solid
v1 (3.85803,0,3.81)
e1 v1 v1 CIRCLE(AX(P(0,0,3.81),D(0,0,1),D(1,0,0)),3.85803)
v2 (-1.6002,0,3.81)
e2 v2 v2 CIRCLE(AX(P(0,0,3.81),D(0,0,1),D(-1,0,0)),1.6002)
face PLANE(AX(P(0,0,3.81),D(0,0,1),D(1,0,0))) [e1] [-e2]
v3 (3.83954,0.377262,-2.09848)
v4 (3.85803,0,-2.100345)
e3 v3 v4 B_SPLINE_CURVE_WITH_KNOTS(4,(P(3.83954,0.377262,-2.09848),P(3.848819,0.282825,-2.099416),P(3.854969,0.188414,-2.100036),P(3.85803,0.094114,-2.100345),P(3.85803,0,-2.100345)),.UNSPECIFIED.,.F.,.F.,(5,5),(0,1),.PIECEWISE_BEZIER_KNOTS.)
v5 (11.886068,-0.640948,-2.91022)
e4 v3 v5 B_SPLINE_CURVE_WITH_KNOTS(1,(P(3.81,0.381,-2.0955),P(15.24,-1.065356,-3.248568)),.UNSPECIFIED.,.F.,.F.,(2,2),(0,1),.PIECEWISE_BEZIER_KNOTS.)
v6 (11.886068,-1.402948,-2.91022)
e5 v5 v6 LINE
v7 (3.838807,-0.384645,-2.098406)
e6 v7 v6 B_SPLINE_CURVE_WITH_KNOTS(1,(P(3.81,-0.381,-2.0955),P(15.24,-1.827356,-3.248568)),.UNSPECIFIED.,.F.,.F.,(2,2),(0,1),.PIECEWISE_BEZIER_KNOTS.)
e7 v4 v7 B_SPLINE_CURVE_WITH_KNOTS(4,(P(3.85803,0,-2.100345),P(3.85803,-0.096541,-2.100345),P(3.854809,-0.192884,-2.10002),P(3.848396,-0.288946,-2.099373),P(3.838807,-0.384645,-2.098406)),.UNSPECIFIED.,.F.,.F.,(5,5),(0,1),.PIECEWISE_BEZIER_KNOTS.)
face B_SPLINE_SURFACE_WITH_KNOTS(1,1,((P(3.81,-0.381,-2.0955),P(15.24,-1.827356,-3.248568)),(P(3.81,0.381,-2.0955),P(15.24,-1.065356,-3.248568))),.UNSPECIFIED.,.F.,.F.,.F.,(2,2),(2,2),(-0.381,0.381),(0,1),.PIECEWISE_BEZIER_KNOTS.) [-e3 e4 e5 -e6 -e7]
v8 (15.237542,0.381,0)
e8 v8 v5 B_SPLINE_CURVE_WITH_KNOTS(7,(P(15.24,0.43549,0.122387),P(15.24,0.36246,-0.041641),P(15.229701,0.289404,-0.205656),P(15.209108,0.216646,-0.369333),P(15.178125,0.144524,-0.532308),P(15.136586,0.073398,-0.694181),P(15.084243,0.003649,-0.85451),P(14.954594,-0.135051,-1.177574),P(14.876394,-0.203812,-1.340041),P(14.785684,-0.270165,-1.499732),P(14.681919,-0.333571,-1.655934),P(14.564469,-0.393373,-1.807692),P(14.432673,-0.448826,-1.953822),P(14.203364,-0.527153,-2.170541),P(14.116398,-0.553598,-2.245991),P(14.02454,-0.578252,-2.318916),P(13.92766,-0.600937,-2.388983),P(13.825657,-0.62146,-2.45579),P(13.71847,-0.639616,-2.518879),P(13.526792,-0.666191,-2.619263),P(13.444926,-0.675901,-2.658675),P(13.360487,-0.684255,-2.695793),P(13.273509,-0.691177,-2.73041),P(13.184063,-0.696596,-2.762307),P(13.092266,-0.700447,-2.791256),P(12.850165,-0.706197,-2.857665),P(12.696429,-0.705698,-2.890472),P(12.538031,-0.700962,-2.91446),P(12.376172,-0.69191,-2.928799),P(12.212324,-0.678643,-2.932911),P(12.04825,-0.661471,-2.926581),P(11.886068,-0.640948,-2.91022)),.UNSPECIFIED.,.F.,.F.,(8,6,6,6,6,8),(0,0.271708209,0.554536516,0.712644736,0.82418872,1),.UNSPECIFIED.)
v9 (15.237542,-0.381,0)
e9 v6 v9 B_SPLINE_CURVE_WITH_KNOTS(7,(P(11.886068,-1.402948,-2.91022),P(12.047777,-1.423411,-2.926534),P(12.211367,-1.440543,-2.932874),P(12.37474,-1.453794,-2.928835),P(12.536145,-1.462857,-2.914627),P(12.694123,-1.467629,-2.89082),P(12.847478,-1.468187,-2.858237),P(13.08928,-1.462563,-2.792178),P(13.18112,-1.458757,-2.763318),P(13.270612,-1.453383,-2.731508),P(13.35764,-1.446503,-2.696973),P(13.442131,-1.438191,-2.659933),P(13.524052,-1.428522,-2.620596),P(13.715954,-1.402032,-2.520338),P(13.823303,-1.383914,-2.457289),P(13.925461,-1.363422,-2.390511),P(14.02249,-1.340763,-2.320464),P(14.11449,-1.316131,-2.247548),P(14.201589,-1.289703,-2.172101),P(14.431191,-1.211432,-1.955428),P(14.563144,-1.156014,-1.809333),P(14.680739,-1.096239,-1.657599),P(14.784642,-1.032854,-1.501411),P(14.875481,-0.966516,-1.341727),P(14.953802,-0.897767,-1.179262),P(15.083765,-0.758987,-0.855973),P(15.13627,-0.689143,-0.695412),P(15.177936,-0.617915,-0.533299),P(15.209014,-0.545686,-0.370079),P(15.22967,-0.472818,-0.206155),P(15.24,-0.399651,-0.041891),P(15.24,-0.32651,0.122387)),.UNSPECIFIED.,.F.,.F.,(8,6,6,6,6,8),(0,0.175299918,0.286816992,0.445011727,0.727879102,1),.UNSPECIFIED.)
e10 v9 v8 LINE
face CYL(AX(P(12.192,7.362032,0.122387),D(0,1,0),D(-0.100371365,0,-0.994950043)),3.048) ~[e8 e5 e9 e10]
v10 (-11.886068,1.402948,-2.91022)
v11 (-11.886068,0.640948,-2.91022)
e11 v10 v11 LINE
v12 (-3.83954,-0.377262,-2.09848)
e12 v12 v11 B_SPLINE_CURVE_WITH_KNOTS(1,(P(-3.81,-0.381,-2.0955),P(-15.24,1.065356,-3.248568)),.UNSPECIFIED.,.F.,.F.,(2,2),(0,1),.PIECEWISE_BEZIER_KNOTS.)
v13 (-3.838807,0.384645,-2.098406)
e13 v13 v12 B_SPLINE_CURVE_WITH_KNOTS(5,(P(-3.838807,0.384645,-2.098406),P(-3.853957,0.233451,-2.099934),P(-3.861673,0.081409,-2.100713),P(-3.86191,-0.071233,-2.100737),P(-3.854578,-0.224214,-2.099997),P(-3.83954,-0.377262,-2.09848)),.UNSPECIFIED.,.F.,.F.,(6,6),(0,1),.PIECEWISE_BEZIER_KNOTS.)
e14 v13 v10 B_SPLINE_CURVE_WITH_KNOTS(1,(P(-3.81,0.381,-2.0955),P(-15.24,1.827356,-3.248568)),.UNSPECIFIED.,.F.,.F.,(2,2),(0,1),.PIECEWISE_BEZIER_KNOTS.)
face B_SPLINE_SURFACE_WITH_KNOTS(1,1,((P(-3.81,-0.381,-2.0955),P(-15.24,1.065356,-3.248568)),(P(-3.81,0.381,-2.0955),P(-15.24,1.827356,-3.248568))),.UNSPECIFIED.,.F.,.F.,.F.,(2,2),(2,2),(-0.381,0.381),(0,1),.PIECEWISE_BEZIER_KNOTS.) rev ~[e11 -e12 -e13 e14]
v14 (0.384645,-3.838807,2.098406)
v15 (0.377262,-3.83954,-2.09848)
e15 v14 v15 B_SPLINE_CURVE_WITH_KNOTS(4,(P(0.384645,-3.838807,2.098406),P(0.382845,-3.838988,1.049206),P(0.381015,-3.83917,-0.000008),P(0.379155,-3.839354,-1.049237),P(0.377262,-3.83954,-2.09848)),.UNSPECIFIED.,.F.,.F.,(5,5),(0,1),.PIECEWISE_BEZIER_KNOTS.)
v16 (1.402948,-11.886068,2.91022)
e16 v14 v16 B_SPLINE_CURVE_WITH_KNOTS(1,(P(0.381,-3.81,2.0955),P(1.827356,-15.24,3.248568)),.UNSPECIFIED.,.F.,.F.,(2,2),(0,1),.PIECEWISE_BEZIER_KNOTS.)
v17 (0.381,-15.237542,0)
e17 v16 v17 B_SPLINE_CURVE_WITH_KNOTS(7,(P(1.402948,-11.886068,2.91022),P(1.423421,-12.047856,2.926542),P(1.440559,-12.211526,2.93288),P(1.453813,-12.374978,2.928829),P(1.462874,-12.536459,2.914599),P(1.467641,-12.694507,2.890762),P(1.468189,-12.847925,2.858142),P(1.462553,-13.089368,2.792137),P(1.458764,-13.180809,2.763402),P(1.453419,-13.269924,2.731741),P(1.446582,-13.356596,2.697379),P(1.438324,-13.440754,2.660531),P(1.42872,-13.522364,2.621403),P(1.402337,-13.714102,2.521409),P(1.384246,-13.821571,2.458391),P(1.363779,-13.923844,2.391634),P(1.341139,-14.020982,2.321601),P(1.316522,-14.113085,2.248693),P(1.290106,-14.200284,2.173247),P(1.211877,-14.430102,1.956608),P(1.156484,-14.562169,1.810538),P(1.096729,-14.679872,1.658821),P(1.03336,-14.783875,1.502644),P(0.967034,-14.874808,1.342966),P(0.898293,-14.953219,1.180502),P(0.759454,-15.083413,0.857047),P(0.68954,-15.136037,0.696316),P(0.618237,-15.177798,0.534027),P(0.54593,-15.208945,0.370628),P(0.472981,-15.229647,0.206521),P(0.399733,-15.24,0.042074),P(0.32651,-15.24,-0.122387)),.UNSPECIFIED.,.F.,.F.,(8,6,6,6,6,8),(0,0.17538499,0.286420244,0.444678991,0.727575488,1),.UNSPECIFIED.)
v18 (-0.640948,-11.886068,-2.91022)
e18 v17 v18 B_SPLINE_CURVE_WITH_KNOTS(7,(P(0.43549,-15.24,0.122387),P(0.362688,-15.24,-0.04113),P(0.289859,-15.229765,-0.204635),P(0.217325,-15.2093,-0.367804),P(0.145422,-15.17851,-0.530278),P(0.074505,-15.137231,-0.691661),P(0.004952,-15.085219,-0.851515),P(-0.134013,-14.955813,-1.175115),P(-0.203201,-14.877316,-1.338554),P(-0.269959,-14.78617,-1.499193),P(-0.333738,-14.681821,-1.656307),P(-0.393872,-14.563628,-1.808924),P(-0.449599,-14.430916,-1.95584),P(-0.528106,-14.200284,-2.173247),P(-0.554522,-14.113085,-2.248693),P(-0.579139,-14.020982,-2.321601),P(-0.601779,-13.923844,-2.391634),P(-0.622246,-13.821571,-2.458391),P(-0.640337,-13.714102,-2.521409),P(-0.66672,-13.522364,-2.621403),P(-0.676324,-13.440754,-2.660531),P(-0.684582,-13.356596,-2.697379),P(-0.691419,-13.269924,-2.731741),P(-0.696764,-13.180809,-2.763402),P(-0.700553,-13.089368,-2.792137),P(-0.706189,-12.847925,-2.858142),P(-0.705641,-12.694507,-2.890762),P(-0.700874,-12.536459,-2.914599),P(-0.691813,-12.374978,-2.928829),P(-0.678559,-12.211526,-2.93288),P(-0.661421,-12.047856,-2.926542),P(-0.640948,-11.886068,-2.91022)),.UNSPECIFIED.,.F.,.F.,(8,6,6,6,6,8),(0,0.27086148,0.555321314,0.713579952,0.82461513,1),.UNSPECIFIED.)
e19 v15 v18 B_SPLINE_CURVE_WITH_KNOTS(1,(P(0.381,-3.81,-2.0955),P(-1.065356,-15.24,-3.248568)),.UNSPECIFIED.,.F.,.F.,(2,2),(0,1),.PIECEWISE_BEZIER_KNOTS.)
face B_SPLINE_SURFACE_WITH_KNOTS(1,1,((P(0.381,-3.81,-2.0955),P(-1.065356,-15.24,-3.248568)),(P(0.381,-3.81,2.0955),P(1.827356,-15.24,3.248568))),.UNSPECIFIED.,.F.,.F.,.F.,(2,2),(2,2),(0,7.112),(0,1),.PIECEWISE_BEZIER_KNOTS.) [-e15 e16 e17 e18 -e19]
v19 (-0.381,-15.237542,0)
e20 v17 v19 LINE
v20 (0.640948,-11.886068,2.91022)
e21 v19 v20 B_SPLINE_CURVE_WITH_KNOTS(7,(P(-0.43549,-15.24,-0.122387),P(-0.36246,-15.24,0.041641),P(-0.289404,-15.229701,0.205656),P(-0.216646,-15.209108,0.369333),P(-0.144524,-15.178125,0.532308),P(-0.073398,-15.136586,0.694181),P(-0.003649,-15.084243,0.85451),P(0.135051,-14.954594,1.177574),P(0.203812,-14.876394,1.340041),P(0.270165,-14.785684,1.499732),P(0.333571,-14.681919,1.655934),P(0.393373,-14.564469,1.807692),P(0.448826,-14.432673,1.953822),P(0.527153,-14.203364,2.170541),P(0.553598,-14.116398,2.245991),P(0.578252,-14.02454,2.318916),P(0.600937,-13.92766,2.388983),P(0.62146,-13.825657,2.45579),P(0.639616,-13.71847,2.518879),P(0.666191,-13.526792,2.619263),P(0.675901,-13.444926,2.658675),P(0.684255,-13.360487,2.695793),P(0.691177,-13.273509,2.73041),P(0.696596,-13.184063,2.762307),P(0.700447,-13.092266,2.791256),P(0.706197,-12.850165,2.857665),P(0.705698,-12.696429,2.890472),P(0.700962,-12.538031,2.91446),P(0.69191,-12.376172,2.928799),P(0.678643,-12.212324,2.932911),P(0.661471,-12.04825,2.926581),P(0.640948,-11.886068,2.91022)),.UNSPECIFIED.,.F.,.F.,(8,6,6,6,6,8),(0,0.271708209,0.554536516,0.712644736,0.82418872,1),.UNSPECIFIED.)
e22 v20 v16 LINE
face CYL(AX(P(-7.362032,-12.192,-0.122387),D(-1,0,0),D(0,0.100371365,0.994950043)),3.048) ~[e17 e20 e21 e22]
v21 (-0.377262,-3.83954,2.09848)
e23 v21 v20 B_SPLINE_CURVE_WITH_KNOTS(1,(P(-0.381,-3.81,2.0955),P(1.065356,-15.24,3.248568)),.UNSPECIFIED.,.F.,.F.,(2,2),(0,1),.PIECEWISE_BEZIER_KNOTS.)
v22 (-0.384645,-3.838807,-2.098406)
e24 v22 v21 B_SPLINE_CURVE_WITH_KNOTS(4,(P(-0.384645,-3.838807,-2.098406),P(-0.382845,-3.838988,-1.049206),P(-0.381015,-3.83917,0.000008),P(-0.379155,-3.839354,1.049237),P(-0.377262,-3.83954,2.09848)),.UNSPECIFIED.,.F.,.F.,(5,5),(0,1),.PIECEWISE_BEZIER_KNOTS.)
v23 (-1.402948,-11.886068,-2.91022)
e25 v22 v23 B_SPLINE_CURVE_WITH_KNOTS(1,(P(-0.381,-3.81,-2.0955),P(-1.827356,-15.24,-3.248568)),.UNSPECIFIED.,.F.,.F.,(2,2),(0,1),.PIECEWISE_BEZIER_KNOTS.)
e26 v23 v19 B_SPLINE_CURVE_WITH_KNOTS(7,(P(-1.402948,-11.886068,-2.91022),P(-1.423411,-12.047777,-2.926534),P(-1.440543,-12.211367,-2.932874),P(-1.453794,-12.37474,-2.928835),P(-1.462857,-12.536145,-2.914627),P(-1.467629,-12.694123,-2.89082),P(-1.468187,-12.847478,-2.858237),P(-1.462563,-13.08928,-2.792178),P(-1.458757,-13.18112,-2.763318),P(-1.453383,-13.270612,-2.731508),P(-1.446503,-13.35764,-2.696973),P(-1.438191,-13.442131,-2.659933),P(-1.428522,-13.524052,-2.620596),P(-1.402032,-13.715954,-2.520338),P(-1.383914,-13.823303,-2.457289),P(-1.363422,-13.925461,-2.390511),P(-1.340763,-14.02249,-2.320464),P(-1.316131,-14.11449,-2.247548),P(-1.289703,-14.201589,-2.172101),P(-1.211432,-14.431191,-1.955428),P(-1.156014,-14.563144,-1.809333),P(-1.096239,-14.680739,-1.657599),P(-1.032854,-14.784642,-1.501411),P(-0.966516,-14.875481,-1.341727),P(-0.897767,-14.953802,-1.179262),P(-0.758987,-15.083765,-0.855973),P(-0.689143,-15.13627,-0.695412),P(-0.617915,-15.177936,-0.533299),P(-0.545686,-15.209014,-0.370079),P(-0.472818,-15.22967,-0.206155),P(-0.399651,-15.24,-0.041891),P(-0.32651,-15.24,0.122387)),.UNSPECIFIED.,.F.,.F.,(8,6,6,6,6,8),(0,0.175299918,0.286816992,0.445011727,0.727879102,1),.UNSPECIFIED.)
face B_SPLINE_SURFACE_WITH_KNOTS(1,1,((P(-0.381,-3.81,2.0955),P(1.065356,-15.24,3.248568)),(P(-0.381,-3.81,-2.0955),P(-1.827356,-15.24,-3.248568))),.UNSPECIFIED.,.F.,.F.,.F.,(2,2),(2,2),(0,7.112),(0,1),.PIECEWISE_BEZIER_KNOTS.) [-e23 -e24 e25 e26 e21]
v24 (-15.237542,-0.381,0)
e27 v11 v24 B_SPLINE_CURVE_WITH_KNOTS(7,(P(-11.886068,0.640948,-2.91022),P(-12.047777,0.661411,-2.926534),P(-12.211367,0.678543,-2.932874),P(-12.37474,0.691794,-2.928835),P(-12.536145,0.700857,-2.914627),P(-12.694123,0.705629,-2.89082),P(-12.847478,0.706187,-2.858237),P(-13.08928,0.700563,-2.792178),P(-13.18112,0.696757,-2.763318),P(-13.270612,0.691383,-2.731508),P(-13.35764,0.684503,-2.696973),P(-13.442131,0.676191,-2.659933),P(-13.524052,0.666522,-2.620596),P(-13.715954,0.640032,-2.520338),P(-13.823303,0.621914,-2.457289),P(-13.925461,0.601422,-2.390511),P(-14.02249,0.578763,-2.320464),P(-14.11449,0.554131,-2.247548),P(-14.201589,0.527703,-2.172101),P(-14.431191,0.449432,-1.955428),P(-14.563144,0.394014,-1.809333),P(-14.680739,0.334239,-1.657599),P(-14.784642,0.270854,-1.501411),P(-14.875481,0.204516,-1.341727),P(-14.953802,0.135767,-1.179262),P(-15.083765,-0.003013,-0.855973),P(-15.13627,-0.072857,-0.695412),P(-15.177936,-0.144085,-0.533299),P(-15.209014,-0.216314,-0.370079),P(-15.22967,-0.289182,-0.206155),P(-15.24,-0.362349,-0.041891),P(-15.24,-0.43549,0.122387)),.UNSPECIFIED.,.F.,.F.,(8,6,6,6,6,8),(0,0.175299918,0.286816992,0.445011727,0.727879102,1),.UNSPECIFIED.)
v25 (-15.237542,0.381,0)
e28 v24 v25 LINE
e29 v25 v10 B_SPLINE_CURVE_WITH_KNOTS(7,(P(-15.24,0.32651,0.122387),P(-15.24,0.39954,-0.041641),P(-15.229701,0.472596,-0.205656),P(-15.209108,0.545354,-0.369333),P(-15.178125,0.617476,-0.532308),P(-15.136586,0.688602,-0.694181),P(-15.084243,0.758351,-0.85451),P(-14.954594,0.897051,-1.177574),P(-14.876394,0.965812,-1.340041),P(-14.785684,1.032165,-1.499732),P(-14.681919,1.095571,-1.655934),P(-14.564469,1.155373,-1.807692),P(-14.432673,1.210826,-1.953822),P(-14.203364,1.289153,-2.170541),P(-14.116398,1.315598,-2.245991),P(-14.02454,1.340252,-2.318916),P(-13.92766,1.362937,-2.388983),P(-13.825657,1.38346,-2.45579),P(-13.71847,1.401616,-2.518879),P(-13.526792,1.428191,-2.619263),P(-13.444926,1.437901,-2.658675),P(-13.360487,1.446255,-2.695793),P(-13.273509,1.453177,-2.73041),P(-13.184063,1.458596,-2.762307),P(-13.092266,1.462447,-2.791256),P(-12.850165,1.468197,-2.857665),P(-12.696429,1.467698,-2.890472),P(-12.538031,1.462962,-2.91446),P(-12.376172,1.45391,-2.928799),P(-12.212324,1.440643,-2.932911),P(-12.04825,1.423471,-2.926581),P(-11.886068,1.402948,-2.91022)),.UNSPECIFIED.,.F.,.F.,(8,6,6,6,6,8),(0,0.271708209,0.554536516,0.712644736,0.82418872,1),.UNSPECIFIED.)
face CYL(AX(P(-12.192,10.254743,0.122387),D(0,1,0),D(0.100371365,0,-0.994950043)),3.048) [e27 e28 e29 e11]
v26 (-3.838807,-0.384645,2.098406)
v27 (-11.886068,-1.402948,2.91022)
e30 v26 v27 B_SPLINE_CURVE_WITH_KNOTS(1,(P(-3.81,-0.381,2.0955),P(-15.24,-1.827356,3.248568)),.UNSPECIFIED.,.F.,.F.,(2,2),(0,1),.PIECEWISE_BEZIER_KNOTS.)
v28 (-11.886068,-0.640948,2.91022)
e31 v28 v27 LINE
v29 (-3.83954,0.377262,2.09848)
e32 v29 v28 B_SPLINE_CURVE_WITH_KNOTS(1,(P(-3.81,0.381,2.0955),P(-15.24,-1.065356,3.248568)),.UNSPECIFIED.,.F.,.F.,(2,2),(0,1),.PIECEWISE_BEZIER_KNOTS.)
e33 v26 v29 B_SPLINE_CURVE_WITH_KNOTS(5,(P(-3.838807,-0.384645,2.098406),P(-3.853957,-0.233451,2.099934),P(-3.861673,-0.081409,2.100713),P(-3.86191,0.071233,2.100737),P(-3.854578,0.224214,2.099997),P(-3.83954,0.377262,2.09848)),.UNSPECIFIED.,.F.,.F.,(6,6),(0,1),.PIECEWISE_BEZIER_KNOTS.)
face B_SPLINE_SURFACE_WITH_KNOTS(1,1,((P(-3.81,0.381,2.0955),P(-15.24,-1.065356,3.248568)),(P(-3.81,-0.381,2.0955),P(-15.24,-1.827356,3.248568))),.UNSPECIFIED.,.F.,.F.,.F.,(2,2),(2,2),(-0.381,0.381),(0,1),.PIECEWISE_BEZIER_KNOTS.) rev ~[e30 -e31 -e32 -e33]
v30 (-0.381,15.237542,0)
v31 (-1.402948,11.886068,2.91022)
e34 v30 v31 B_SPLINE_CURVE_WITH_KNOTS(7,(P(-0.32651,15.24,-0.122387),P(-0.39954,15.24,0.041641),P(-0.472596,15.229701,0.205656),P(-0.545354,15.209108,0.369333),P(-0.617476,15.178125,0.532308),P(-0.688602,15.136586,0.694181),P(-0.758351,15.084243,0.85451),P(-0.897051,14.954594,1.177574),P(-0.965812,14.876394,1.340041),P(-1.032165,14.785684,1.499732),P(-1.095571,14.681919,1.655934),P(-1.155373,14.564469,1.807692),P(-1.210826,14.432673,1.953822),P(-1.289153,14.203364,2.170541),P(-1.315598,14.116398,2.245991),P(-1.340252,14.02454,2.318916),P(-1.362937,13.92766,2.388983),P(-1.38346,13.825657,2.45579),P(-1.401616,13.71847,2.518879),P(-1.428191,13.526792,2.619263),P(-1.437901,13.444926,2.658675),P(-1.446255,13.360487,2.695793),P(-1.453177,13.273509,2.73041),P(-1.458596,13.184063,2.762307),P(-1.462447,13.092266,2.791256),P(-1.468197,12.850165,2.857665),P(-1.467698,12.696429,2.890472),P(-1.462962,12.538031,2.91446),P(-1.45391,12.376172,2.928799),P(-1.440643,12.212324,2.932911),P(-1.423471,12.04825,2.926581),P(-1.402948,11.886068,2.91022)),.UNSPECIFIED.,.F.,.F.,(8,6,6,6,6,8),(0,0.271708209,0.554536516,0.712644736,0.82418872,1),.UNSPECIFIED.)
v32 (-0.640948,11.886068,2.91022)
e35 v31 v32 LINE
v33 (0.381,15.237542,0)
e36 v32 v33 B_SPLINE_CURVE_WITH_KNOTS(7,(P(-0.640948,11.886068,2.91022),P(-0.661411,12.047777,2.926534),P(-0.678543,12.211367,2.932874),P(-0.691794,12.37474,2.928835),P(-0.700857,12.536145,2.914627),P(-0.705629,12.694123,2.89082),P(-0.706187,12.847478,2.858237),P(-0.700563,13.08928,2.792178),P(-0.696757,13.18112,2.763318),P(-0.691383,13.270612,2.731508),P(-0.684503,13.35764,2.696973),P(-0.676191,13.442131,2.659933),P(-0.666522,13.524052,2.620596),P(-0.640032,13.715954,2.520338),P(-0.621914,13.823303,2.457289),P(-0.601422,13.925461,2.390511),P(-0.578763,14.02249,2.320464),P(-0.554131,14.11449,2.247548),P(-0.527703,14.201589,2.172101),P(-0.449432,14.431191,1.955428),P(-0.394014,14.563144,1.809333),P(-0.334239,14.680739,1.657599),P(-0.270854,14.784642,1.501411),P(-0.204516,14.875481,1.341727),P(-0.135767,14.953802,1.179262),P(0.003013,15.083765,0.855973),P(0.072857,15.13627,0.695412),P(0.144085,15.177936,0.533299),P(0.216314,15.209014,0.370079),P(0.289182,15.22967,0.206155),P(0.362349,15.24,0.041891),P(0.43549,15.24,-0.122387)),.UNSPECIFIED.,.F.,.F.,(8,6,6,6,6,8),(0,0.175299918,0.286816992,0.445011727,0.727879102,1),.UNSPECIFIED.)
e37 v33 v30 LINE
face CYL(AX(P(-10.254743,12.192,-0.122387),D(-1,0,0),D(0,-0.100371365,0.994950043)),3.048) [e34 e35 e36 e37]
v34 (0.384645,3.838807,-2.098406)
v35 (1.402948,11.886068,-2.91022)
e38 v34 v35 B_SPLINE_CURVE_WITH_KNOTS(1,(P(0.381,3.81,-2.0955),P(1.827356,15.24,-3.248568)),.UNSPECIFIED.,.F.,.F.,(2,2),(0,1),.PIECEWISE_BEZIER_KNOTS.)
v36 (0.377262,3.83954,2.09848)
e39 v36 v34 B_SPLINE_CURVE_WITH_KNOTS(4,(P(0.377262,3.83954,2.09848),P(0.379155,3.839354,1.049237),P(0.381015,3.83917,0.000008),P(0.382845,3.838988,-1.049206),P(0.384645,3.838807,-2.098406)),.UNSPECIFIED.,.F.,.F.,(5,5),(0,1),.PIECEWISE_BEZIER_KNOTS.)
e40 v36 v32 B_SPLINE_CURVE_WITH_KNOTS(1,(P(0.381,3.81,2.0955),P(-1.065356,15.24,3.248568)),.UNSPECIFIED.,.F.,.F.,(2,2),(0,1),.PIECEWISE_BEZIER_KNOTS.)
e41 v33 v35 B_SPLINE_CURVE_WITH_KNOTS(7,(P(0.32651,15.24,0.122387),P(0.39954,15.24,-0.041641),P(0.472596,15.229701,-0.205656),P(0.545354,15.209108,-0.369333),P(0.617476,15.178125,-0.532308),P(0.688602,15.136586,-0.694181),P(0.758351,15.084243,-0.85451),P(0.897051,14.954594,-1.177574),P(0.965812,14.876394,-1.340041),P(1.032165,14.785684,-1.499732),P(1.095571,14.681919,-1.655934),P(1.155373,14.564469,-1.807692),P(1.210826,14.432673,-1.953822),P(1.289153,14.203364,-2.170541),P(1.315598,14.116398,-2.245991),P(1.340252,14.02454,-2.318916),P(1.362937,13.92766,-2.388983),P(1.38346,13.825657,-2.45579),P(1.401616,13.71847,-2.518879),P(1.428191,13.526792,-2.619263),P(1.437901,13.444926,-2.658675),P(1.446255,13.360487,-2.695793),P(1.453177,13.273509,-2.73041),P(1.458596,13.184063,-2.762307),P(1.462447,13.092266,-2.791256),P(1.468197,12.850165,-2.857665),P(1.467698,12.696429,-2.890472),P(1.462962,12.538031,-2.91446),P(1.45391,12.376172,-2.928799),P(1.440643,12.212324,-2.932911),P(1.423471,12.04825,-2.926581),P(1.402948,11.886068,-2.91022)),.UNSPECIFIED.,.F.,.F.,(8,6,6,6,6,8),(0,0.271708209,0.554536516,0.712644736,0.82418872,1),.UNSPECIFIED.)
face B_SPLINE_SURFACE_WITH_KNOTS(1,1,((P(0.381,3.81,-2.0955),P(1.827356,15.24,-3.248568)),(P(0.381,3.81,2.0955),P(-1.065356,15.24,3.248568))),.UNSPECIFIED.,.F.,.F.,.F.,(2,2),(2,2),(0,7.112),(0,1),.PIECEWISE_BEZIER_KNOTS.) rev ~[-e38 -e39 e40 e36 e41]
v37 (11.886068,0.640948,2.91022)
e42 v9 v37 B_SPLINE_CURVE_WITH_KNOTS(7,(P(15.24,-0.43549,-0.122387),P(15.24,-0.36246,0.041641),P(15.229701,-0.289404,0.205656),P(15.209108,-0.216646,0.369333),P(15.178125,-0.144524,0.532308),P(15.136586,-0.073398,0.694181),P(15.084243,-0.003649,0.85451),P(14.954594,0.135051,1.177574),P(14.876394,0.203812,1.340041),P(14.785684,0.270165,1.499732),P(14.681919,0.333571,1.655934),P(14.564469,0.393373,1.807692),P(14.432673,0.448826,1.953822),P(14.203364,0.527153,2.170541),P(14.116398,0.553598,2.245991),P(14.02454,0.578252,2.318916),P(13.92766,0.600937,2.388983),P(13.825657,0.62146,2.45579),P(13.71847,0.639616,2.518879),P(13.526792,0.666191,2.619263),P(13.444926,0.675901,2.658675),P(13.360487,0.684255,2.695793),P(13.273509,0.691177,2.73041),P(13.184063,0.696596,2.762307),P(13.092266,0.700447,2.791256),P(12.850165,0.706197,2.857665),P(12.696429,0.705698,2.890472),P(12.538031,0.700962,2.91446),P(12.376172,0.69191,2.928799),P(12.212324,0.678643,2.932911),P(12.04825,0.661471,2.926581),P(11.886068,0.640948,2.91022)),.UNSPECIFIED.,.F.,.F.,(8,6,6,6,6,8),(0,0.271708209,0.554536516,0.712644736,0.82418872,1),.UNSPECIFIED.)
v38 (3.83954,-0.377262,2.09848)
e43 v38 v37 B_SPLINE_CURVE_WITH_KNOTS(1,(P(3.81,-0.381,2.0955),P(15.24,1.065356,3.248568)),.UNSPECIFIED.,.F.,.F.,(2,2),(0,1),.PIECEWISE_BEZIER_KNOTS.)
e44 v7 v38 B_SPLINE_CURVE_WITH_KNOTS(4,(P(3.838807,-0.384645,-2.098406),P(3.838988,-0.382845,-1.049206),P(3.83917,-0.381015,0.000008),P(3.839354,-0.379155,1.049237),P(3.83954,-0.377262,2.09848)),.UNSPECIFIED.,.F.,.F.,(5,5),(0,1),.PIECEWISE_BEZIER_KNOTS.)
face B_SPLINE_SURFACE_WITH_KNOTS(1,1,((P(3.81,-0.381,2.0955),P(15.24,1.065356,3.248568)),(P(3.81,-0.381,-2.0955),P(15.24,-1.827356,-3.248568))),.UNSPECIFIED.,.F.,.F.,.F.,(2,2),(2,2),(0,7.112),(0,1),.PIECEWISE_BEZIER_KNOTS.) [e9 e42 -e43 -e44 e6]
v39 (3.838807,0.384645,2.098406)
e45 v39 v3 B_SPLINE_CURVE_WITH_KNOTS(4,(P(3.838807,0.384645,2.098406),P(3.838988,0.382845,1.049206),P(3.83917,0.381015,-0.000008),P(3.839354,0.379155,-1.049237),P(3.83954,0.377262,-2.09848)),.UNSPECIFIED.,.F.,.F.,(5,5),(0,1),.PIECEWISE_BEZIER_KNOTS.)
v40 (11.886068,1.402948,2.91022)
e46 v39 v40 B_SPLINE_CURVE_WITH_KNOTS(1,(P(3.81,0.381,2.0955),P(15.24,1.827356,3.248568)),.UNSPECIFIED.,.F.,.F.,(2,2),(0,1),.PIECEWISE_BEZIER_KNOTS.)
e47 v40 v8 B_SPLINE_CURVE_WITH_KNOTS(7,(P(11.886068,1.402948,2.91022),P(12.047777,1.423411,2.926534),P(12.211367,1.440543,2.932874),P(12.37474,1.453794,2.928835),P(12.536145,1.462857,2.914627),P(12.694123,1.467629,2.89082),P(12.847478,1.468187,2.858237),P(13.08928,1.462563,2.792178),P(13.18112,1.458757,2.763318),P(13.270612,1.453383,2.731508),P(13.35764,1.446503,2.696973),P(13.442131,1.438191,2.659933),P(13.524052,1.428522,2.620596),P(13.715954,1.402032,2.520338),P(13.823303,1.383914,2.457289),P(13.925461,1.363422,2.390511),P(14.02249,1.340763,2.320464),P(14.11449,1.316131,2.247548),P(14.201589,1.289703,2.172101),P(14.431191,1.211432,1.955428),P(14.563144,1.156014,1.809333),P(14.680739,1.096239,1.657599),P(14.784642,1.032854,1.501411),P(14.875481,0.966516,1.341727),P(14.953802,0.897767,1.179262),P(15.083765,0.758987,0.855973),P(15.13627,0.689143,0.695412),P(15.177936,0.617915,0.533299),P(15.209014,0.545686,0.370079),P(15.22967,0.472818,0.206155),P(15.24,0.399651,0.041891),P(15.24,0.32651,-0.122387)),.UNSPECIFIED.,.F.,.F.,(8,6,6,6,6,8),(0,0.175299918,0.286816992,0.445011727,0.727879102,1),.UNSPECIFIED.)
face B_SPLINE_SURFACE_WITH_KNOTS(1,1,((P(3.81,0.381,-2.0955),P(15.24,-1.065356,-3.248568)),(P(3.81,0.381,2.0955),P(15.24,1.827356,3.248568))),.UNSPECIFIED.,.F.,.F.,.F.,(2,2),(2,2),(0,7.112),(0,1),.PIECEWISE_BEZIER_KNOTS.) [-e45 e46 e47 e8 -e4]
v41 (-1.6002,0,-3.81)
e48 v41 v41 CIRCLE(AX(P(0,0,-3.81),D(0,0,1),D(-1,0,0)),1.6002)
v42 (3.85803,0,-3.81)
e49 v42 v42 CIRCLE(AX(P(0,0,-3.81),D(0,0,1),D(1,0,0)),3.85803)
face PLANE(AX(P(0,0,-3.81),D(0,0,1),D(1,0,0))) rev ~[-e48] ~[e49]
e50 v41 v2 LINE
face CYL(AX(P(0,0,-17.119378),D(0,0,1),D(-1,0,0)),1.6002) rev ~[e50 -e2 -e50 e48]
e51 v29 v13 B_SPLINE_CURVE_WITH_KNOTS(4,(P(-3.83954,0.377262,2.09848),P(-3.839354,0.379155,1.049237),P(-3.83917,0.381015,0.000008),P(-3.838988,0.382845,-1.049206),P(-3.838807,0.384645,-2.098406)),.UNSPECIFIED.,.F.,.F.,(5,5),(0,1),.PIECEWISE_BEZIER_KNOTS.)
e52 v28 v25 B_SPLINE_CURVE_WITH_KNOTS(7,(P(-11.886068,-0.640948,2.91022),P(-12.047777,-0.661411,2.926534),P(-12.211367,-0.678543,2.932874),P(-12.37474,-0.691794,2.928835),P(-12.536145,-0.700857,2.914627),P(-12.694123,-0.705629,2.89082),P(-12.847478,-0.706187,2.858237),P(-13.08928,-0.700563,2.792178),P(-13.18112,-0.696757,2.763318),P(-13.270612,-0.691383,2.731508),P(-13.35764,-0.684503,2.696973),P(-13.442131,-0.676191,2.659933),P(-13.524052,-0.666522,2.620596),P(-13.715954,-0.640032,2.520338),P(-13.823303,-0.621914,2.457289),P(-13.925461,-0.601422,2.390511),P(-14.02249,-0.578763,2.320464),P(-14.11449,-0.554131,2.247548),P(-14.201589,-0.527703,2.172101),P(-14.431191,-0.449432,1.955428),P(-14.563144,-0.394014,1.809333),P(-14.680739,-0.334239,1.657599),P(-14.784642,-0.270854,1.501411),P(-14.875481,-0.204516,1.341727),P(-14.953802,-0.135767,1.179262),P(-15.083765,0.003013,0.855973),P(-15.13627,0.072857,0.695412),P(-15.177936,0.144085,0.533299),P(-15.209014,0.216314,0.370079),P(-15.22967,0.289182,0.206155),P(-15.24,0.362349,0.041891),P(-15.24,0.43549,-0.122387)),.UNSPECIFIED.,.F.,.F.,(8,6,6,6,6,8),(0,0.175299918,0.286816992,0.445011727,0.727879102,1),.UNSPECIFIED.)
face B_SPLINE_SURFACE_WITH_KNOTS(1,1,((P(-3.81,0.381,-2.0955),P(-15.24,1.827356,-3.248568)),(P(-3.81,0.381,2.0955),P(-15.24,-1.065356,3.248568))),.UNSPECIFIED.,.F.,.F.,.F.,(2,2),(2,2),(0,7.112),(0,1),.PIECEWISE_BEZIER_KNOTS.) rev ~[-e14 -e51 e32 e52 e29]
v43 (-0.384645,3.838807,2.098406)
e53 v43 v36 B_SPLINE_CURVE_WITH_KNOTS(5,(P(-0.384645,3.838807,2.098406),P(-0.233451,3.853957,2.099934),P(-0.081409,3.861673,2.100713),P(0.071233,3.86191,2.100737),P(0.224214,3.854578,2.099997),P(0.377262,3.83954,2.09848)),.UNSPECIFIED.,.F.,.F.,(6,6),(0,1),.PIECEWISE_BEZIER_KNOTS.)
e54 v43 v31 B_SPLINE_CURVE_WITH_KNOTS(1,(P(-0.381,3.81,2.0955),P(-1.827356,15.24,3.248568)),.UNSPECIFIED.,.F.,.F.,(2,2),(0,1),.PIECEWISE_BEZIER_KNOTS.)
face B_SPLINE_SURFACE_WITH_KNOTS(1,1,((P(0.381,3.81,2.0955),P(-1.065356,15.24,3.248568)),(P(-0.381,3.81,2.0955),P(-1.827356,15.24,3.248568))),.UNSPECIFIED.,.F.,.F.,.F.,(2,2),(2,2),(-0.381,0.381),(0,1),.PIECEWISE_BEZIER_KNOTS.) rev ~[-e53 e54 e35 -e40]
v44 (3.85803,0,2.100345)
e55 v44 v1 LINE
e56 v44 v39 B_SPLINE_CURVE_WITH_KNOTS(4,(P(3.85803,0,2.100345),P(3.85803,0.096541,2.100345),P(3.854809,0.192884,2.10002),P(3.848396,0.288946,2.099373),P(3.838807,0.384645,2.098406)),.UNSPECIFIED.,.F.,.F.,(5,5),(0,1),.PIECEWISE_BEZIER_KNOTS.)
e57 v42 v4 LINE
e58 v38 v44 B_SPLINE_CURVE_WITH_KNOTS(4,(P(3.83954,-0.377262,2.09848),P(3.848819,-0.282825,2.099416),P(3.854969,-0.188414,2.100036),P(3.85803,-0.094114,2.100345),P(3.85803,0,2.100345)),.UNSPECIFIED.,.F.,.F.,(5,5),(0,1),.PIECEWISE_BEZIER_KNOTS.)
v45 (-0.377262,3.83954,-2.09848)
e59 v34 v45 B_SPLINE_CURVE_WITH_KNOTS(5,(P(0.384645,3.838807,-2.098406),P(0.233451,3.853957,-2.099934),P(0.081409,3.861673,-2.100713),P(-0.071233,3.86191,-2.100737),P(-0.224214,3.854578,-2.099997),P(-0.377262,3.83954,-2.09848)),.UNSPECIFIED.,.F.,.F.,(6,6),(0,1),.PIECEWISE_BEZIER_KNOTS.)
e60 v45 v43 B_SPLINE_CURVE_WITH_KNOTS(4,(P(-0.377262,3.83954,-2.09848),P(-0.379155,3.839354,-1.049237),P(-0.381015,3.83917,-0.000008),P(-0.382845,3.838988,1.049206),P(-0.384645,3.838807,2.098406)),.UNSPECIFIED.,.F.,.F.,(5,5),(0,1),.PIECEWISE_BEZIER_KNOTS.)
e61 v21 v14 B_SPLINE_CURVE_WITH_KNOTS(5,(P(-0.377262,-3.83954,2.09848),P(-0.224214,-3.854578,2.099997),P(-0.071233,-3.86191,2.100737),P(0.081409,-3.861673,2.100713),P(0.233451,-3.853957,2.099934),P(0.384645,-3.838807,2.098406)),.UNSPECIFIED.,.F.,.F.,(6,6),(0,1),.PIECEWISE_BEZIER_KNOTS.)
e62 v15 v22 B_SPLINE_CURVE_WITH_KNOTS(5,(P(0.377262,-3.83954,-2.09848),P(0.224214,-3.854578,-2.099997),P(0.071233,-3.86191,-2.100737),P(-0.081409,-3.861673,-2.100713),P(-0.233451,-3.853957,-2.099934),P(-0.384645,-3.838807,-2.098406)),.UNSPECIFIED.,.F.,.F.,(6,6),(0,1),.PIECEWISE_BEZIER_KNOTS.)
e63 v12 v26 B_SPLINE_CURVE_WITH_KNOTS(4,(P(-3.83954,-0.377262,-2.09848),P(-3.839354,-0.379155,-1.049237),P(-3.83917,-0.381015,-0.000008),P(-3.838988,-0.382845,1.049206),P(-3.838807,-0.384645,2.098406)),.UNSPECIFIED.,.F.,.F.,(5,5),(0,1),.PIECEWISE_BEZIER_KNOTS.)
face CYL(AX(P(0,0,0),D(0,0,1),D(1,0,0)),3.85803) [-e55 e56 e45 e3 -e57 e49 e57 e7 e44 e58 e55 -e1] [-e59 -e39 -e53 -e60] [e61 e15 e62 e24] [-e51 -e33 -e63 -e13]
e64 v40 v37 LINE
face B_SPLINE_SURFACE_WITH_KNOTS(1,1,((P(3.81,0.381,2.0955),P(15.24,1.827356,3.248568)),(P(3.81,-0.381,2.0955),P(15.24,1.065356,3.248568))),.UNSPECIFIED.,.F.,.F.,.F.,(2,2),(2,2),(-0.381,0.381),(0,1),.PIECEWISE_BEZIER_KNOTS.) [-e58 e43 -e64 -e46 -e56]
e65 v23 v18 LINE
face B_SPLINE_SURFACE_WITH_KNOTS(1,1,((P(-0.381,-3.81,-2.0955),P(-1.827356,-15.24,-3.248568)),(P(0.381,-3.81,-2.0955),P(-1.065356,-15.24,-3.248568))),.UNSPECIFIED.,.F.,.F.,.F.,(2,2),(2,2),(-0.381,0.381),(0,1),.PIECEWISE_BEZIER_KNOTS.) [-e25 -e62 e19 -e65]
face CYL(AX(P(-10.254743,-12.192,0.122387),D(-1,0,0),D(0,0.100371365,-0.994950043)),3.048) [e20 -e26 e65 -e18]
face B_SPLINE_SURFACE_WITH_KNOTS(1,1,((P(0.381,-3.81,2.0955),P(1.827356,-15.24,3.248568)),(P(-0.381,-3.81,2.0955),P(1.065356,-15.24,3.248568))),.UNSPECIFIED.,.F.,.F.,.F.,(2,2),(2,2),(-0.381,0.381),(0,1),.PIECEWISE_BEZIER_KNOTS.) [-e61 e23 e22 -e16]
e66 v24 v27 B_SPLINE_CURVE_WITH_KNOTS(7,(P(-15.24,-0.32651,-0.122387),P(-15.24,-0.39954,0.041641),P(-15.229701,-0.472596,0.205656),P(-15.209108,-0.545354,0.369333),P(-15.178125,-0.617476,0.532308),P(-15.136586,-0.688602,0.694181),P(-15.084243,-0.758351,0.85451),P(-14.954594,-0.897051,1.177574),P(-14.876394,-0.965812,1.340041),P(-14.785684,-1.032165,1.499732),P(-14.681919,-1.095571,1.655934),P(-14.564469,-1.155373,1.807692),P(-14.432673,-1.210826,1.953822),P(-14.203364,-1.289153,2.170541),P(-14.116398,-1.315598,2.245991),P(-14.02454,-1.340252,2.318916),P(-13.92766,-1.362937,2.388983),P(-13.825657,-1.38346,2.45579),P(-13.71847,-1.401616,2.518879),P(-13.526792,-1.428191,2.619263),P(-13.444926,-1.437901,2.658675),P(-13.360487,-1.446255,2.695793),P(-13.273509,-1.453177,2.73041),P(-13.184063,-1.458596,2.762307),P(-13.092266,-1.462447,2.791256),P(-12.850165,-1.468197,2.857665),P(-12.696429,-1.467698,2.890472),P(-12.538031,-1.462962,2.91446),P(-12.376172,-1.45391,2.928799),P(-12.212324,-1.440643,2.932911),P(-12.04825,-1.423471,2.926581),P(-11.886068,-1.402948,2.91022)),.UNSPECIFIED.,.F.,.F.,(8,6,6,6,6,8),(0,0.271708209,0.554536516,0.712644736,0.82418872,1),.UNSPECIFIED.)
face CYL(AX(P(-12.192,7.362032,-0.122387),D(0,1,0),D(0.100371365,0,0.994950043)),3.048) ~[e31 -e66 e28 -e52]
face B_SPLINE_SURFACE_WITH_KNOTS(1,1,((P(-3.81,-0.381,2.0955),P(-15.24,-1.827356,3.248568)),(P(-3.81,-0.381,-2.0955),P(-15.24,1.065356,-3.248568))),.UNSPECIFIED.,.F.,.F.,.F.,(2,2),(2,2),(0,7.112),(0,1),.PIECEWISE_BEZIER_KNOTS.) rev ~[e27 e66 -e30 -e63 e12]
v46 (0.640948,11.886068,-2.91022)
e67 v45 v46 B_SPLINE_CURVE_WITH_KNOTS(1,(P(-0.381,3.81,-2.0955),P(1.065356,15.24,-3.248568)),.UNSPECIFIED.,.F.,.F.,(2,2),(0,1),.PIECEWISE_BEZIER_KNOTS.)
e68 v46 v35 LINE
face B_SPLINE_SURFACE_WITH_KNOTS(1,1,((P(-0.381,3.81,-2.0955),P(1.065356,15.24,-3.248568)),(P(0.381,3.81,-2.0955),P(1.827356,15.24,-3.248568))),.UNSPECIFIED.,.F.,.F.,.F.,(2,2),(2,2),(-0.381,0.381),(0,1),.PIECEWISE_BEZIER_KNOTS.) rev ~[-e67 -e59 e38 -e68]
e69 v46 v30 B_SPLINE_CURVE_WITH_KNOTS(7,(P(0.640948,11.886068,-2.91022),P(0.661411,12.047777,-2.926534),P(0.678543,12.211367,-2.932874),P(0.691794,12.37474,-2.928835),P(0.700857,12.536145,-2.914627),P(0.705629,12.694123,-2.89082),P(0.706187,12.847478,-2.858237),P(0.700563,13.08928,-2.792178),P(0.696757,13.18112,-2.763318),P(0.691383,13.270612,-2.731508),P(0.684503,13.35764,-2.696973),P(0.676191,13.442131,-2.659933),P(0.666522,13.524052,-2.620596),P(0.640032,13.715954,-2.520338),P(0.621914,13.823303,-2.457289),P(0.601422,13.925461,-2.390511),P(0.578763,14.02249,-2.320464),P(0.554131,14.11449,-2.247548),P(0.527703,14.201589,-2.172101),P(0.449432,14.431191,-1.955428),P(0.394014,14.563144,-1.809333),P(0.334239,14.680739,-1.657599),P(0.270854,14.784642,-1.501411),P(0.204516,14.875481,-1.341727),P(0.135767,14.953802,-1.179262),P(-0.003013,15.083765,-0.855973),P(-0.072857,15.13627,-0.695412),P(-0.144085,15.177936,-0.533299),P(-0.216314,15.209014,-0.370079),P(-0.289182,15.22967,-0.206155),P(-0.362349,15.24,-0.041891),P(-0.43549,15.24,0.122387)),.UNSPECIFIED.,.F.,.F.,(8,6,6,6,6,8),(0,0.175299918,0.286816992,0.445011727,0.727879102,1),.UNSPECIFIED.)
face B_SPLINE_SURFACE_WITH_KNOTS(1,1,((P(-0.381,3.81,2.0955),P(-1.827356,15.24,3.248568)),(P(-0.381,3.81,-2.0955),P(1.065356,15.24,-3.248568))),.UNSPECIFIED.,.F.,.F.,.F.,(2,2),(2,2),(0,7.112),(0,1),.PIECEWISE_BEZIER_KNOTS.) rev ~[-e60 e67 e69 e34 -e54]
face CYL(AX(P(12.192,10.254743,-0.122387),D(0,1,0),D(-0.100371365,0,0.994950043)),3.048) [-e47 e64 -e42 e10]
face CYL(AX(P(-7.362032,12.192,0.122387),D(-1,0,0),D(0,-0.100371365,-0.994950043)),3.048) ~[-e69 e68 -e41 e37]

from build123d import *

# Parameters (mm, degrees)
F0_R          = 3.85802972
F2_DEPTH      = 3.81
F2_DEPTH_BACK = 3.81
F4_D          = 3.2004
F6_W          = 0.762
F6_H          = 4.191
F10_W         = 0.762
F10_H         = 4.191
F14_W         = 0.762
F14_H         = 4.191
F17_W         = 0.762
F17_H         = 4.191
F25_T1_DEPTH  = 17.6167754913
F25_T3_DEPTH  = 17.6167754913
F25_T5_DEPTH  = 17.6167754913
F25_T7_DEPTH  = 17.6167754913


# Not quite as in the source:
# - a fillet or chamfer that OpenCascade refuses, or shapes differently, is made with other operations: its cross-section is extruded or revolved along the edge and cut away or added


with BuildPart() as f2:
    # F0 (on Top) → F2 (new body, two sides)
    with BuildSketch(Plane.XY) as f2_sk:
        Circle(F0_R)
    extrude(amount=F2_DEPTH)
    extrude(f2_sk.sketch, amount=-F2_DEPTH_BACK)

    # F4 (through all)
    with Locations(Plane(origin=(0, 0, -3.81), x_dir=(1, 0, 0), z_dir=(0, 0, -1))):
        with Locations((0, 0)):
            Hole(F4_D / 2)

    # F6 (on offset) → F21 section 0
    with BuildSketch(Plane.YZ.offset(3.81)):
        Rectangle(F6_W, F6_H)
    # F20 (on offset) → F21 section 1
    with BuildSketch(Plane.YZ.offset(15.24)):
        Polygon((-1.8273555028, -3.2485676474), (-1.0653555028, -3.2485676474), (1.8273555028, 3.2485676474), (1.0653555028, 3.2485676474), align=None)
    loft()

    # F10 (on offset) → F22 section 0
    with BuildSketch(Plane.XZ.offset(-3.81)):
        Rectangle(F10_W, F10_H)
    # F11 (on offset) → F22 section 1
    with BuildSketch(Plane.XZ.offset(-15.24)):
        Polygon((-1.8273555028, 3.2485676474), (1.0653555028, -3.2485676474), (1.8273555028, -3.2485676474), (-1.0653555028, 3.2485676474), align=None)
    loft()

    # F14 (on offset) → F23 section 0
    with BuildSketch(Plane.YZ.offset(-3.81)):
        Rectangle(F14_W, F14_H)
    # F19 (on offset) → F23 section 1
    with BuildSketch(Plane.YZ.offset(-15.24)):
        Polygon((1.0653555028, -3.2485676474), (1.8273555028, -3.2485676474), (-1.0653555028, 3.2485676474), (-1.8273555028, 3.2485676474), align=None)
    loft()

    # F17 (on offset) → F24 section 0
    with BuildSketch(Plane.XZ.offset(3.81)):
        Rectangle(F17_W, F17_H)
    # F18 (on offset) → F24 section 1
    with BuildSketch(Plane.XZ.offset(15.24)):
        Polygon((-1.8273555028, -3.2485676474), (-1.0653555028, -3.2485676474), (1.8273555028, 3.2485676474), (1.0653555028, 3.2485676474), align=None)
    loft()

    # F25: fillet of radius 3.048 on 8 edges, made by hand

    # F25_s2 → F25_t1 (cut)
    with BuildSketch(Plane.XZ.offset(-7.3620322429)):
        with BuildLine():
            ThreePointArc((-11.8860680784, 2.9102202816), (-14.2362386728, 2.1384513865), (-15.24, -0.1223874509))
            Line((-15.24, -0.1223874509), (-15.24, 3.2485676474))
            Line((-15.24, 3.2485676474), (-11.8860680784, 2.9102202816))
        make_face()
        with BuildLine():
            ThreePointArc((11.8860680784, -2.9102202816), (14.2362386728, -2.1384513865), (15.24, 0.1223874509))
            Line((15.24, 0.1223874509), (15.24, -3.2485676474))
            Line((15.24, -3.2485676474), (11.8860680784, -2.9102202816))
        make_face()
    extrude(amount=F25_T1_DEPTH, mode=Mode.SUBTRACT)

    # F25_s4 → F25_t3 (cut)
    with BuildSketch(Plane.XZ.offset(-10.2547432484)):
        with BuildLine():
            ThreePointArc((-11.8860680784, -2.9102202816), (-14.2362386728, -2.1384513865), (-15.24, 0.1223874509))
            Line((-15.24, 0.1223874509), (-15.24, -3.2485676474))
            Line((-15.24, -3.2485676474), (-11.8860680784, -2.9102202816))
        make_face()
        with BuildLine():
            ThreePointArc((11.8860680784, 2.9102202816), (14.2362386728, 2.1384513865), (15.24, -0.1223874509))
            Line((15.24, -0.1223874509), (15.24, 3.2485676474))
            Line((15.24, 3.2485676474), (11.8860680784, 2.9102202816))
        make_face()
    extrude(amount=F25_T3_DEPTH, mode=Mode.SUBTRACT)

    # F25_s6 → F25_t5 (cut)
    with BuildSketch(Plane.YZ.offset(-7.3620322429)):
        with BuildLine():
            ThreePointArc((11.8860680784, -2.9102202816), (14.2362386728, -2.1384513865), (15.24, 0.1223874509))
            Line((15.24, 0.1223874509), (15.24, -3.2485676474))
            Line((15.24, -3.2485676474), (11.8860680784, -2.9102202816))
        make_face()
        with BuildLine():
            ThreePointArc((-11.8860680784, 2.9102202816), (-14.2362386728, 2.1384513865), (-15.24, -0.1223874509))
            Line((-15.24, -0.1223874509), (-15.24, 3.2485676474))
            Line((-15.24, 3.2485676474), (-11.8860680784, 2.9102202816))
        make_face()
    extrude(amount=F25_T5_DEPTH, mode=Mode.SUBTRACT)

    # F25_s8 → F25_t7 (cut)
    with BuildSketch(Plane.YZ.offset(-10.2547432484)):
        with BuildLine():
            ThreePointArc((11.8860680784, 2.9102202816), (14.2362386728, 2.1384513865), (15.24, -0.1223874509))
            Line((15.24, -0.1223874509), (15.24, 3.2485676474))
            Line((15.24, 3.2485676474), (11.8860680784, 2.9102202816))
        make_face()
        with BuildLine():
            ThreePointArc((-11.8860680784, -2.9102202816), (-14.2362386728, -2.1384513865), (-15.24, 0.1223874509))
            Line((-15.24, 0.1223874509), (-15.24, -3.2485676474))
            Line((-15.24, -3.2485676474), (-11.8860680784, -2.9102202816))
        make_face()
    extrude(amount=F25_T7_DEPTH, mode=Mode.SUBTRACT)


solid = f2.part
